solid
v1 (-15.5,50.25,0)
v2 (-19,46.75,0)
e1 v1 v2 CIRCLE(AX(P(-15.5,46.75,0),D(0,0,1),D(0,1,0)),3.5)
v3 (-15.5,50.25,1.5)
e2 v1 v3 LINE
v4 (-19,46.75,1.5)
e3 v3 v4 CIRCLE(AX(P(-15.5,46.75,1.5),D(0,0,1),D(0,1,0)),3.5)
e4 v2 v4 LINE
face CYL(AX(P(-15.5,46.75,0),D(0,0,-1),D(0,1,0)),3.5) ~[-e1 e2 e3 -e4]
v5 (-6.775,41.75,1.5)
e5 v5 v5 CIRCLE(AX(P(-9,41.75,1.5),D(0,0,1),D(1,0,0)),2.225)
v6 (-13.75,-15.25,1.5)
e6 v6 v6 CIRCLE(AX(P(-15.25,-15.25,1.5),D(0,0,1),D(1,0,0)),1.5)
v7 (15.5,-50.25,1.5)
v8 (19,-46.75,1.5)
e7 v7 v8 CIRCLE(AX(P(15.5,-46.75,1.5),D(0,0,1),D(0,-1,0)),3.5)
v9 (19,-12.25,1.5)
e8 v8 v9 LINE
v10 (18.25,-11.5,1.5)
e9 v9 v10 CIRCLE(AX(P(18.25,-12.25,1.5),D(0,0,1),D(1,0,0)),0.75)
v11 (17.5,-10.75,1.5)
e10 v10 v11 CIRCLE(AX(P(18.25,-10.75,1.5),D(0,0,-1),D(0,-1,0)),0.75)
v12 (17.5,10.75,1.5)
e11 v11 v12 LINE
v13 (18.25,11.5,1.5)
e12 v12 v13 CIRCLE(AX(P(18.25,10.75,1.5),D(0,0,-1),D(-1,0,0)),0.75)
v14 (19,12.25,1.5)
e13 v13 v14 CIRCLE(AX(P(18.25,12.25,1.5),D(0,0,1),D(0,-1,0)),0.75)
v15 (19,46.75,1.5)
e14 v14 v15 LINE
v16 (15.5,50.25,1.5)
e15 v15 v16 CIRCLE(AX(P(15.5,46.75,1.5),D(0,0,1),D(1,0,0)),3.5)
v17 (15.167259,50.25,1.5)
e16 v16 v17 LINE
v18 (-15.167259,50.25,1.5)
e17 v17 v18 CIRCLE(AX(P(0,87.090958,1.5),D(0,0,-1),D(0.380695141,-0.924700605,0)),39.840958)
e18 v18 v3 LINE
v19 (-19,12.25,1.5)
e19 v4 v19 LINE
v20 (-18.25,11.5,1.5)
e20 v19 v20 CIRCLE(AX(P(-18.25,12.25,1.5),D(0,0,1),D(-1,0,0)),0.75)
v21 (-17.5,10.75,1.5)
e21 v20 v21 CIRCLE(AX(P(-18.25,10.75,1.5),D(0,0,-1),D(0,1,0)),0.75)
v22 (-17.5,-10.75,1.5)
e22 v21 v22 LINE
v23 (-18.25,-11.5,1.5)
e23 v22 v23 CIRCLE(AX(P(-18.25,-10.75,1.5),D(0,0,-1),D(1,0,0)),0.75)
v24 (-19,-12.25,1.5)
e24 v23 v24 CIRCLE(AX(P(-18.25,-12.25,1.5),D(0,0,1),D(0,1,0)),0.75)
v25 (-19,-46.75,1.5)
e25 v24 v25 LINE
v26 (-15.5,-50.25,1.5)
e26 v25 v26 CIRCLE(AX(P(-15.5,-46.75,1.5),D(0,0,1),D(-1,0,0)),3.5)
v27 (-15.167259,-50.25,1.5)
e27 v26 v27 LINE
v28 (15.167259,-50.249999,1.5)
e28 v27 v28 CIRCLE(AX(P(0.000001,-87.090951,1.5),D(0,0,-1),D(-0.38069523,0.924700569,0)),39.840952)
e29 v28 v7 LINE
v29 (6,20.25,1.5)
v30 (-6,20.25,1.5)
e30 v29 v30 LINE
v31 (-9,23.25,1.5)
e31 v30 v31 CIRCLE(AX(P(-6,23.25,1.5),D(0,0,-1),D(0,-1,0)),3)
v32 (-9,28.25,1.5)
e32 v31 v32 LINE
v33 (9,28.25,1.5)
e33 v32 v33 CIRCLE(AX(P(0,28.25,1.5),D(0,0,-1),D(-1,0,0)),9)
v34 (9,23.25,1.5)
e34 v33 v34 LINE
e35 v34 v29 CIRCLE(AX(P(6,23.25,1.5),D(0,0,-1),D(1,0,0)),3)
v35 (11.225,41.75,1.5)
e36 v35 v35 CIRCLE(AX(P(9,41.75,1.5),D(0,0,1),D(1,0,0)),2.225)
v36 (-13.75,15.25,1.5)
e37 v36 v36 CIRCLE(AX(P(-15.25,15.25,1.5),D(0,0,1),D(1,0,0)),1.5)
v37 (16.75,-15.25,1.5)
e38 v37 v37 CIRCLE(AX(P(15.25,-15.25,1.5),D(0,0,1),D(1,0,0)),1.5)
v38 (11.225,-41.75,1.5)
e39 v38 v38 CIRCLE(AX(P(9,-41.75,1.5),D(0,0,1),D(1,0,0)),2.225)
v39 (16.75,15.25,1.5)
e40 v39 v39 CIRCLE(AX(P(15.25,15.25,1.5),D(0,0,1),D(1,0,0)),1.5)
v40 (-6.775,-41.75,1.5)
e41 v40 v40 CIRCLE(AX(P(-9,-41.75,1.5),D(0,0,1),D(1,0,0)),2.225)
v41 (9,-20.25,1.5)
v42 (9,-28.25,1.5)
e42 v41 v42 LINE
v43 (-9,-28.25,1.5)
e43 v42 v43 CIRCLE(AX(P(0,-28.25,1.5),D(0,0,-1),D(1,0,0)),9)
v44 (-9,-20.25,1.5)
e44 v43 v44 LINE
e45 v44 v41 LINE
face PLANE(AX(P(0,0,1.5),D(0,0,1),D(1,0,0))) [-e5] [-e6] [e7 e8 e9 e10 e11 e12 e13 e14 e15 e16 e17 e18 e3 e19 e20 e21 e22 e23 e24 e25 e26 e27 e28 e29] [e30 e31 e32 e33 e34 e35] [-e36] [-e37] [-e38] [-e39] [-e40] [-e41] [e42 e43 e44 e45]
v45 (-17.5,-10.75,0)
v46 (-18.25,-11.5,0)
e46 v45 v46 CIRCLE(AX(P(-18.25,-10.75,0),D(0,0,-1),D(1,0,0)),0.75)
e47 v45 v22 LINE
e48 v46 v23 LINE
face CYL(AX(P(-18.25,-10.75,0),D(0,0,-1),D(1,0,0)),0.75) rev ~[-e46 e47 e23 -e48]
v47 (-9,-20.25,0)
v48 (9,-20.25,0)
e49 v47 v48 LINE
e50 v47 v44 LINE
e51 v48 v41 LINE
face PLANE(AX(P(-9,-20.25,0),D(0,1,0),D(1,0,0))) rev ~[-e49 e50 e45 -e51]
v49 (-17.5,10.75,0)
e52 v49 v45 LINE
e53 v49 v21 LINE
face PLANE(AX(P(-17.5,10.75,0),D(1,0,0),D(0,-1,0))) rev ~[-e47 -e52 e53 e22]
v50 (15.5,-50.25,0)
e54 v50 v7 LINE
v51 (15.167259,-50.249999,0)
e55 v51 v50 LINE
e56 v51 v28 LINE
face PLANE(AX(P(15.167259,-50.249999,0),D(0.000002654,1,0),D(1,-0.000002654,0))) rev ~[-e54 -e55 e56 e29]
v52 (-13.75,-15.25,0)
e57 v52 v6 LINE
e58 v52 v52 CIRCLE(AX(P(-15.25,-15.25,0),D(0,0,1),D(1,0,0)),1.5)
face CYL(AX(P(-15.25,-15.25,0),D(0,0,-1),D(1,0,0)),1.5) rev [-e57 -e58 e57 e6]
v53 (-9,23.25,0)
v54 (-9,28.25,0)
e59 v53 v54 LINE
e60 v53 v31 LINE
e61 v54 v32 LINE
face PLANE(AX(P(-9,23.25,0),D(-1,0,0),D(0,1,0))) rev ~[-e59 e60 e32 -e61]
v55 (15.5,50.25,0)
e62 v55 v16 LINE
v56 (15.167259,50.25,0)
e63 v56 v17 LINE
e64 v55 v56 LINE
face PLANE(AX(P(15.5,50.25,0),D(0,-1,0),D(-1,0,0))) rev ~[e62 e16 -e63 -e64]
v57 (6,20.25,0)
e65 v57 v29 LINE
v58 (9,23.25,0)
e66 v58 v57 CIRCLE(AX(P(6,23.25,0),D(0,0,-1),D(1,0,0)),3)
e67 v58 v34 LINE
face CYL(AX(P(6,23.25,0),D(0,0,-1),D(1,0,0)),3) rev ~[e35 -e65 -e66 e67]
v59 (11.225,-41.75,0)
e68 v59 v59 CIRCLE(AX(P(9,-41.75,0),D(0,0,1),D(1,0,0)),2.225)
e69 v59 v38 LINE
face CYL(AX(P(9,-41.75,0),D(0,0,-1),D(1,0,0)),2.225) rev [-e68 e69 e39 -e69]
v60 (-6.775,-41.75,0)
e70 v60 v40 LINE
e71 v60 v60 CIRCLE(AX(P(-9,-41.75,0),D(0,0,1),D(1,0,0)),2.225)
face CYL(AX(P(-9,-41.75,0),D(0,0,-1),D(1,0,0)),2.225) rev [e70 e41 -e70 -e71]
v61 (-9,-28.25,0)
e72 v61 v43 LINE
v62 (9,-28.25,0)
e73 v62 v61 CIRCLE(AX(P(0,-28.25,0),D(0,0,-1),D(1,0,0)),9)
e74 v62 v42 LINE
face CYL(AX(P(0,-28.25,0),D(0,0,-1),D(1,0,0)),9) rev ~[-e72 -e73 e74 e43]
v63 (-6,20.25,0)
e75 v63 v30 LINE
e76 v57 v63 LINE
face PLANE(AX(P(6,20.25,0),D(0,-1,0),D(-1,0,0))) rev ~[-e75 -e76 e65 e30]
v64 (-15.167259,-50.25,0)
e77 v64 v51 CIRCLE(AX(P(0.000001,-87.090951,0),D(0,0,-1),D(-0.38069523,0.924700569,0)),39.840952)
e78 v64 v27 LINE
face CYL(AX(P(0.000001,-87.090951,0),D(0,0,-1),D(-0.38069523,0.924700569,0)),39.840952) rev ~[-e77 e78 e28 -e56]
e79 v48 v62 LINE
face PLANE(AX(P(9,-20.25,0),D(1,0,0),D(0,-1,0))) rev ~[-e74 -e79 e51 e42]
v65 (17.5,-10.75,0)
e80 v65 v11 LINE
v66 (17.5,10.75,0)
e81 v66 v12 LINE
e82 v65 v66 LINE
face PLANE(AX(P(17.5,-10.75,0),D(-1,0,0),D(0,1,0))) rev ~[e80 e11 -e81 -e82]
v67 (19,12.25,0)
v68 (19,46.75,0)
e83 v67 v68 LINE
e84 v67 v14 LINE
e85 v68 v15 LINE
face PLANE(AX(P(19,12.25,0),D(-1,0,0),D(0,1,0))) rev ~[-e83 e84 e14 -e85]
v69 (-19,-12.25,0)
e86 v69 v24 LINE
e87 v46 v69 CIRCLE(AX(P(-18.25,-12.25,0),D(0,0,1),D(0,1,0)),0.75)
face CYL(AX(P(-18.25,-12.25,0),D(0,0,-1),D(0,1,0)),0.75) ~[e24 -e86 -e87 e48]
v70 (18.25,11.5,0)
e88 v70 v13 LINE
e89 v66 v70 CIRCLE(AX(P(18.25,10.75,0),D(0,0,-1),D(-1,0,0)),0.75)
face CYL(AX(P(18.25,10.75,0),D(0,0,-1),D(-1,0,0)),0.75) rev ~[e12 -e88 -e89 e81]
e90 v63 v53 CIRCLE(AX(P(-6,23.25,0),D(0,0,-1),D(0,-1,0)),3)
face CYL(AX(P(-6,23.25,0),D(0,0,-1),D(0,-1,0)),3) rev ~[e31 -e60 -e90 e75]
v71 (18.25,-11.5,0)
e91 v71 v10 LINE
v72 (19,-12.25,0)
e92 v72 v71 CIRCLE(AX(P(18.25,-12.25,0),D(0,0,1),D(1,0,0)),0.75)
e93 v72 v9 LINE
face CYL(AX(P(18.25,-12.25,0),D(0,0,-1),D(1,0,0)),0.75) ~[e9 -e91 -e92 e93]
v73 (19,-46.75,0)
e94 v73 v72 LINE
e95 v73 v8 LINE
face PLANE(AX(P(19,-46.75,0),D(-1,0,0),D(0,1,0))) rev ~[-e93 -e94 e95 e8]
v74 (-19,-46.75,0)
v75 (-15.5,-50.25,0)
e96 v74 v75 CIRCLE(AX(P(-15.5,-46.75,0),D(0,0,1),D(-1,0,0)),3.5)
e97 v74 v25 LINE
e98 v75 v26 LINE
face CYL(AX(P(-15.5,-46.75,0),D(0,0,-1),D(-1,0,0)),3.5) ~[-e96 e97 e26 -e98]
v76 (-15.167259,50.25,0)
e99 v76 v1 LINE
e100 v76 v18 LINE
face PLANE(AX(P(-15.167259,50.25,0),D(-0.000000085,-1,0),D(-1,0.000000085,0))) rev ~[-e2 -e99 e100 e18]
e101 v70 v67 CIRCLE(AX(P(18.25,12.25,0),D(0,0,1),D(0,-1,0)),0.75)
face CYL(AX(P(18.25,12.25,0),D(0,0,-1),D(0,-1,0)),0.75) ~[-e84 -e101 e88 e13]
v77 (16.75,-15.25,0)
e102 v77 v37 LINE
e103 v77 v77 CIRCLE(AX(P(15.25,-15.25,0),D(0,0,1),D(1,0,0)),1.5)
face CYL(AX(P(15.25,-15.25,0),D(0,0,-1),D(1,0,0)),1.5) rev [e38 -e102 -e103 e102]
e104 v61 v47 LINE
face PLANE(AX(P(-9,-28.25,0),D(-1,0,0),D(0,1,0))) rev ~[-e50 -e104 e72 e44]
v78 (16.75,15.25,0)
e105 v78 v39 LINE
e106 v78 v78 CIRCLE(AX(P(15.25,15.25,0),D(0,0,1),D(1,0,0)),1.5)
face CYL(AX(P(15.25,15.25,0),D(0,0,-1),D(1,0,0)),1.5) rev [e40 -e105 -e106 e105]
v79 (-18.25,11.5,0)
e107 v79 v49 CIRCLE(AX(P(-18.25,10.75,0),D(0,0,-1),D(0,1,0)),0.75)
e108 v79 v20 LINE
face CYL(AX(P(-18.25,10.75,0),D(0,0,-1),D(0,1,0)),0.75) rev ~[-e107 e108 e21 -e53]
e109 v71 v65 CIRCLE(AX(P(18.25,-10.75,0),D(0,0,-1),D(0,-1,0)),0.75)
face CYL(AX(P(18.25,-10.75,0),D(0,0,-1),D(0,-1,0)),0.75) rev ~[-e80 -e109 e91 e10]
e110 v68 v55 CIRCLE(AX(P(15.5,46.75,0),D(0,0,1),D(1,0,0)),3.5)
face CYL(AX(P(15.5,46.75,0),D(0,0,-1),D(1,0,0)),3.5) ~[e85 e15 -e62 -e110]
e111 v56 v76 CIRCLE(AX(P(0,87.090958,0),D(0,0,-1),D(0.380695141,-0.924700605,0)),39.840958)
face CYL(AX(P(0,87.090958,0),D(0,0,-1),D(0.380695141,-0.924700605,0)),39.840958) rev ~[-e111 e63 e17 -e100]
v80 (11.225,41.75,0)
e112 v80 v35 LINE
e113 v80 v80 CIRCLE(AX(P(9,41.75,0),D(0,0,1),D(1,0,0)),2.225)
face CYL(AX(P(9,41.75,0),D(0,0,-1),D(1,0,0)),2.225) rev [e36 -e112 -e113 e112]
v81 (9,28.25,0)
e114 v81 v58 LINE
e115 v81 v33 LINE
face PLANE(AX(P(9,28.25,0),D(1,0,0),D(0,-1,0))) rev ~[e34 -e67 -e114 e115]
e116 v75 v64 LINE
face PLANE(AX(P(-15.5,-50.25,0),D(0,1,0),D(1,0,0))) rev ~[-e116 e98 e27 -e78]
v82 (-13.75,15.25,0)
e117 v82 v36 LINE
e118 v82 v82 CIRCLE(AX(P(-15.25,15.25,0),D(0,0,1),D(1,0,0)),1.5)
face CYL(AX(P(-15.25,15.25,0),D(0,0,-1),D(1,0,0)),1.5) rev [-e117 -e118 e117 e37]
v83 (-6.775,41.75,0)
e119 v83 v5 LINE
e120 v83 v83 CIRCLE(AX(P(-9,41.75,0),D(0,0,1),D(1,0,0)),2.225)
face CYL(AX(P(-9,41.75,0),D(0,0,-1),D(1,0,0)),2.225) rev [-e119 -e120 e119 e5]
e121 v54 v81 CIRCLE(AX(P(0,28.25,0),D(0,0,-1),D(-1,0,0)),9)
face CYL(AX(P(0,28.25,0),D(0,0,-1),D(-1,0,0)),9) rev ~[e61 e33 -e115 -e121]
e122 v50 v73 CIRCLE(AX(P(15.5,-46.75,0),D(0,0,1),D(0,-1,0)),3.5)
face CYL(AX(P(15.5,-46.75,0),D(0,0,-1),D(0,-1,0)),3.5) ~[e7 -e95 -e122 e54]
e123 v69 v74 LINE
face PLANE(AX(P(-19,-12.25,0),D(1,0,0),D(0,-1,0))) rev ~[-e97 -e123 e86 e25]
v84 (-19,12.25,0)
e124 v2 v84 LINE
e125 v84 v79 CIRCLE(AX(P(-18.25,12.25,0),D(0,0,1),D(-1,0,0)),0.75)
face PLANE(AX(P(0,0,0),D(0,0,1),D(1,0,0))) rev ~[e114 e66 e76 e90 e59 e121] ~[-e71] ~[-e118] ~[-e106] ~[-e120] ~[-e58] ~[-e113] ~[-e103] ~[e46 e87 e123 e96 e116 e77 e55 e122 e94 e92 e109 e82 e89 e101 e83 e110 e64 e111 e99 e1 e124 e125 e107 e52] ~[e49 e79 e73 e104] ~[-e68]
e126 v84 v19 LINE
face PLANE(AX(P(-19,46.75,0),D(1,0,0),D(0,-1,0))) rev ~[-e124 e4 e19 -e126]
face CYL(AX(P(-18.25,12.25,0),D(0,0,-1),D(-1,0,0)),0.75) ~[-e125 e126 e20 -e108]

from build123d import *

# Parameters (mm, degrees)
F0_R     = 2.225
F0_R_2   = 1.5
F1_DEPTH = 1.5


# Not quite as in the source:
# - ends of sketch curves that miss each other by under 0.0002 mm in the source are joined


with BuildPart() as f1:
    # F0 (on Top) → F1 (new body)
    with BuildSketch(Plane.XY):
        with BuildLine():
            ThreePointArc((15.5, -50.25), (17.9748737342, -49.2248737342), (19, -46.75))
            Line((19, -46.75), (19, -12.25))
            ThreePointArc((19, -12.25), (18.7803300859, -11.7196699141), (18.25, -11.5))
            ThreePointArc((18.25, -11.5), (17.7196699141, -11.2803300859), (17.5, -10.75))
            Line((17.5, -10.75), (17.5, 10.75))
            ThreePointArc((17.5, 10.75), (17.7196699141, 11.2803300859), (18.25, 11.5))
            ThreePointArc((18.25, 11.5), (18.7803300859, 11.7196699141), (19, 12.25))
            Line((19, 12.25), (19, 46.75))
            ThreePointArc((19, 46.75), (17.9748737342, 49.2248737342), (15.5, 50.25))
            Line((15.5, 50.25), (15.167259, 50.25))
            ThreePointArc((15.167259, 50.25), (0, 47.25), (-15.1672590116, 50.2499999718))
            Line((-15.1672590116, 50.2499999718), (-15.5, 50.25))
            ThreePointArc((-15.5, 50.25), (-17.9748737342, 49.2248737342), (-19, 46.75))
            Line((-19, 46.75), (-19, 12.25))
            ThreePointArc((-19, 12.25), (-18.7803300859, 11.7196699141), (-18.25, 11.5))
            ThreePointArc((-18.25, 11.5), (-17.7196699141, 11.2803300859), (-17.5, 10.75))
            Line((-17.5, 10.75), (-17.5, -10.75))
            ThreePointArc((-17.5, -10.75), (-17.7196699141, -11.2803300859), (-18.25, -11.5))
            ThreePointArc((-18.25, -11.5), (-18.7803300859, -11.7196699141), (-19, -12.25))
            Line((-19, -12.25), (-19, -46.75))
            ThreePointArc((-19, -46.75), (-17.9748737342, -49.2248737342), (-15.5, -50.25))
            Line((-15.5, -50.25), (-15.167259, -50.25))
            ThreePointArc((-15.167259, -50.25), (0, -47.249999), (15.1672593636, -50.2499991168))
            Line((15.1672593636, -50.2499991168), (15.5, -50.25))
        make_face()
        with Locations((-9, -41.75)):
            Circle(F0_R, mode=Mode.SUBTRACT)
        with Locations((-15.25, -15.25)):
            Circle(F0_R_2, mode=Mode.SUBTRACT)
        with Locations((9, -41.75)):
            Circle(F0_R, mode=Mode.SUBTRACT)
        with BuildLine():
            Line((-9, -20.25), (9, -20.25))
            Line((9, -20.25), (9, -28.25))
            ThreePointArc((9, -28.25), (0, -37.25), (-9, -28.25))
            Line((-9, -28.25), (-9, -20.25))
        make_face(mode=Mode.SUBTRACT)
        with Locations((15.25, -15.25)):
            Circle(F0_R_2, mode=Mode.SUBTRACT)
        with Locations((-15.25, 15.25)):
            Circle(F0_R_2, mode=Mode.SUBTRACT)
        with Locations((-9, 41.75)):
            Circle(F0_R, mode=Mode.SUBTRACT)
        with Locations((15.25, 15.25)):
            Circle(F0_R_2, mode=Mode.SUBTRACT)
        with BuildLine():
            ThreePointArc((9, 23.25), (8.1213203436, 21.1286796564), (6, 20.25))
            Line((6, 20.25), (-6, 20.25))
            ThreePointArc((-6, 20.25), (-8.1213203436, 21.1286796564), (-9, 23.25))
            Line((-9, 23.25), (-9, 28.25))
            ThreePointArc((-9, 28.25), (0, 37.25), (9, 28.25))
            Line((9, 28.25), (9, 23.25))
        make_face(mode=Mode.SUBTRACT)
        with Locations((9, 41.75)):
            Circle(F0_R, mode=Mode.SUBTRACT)
    extrude(amount=F1_DEPTH)


solid = f1.part
